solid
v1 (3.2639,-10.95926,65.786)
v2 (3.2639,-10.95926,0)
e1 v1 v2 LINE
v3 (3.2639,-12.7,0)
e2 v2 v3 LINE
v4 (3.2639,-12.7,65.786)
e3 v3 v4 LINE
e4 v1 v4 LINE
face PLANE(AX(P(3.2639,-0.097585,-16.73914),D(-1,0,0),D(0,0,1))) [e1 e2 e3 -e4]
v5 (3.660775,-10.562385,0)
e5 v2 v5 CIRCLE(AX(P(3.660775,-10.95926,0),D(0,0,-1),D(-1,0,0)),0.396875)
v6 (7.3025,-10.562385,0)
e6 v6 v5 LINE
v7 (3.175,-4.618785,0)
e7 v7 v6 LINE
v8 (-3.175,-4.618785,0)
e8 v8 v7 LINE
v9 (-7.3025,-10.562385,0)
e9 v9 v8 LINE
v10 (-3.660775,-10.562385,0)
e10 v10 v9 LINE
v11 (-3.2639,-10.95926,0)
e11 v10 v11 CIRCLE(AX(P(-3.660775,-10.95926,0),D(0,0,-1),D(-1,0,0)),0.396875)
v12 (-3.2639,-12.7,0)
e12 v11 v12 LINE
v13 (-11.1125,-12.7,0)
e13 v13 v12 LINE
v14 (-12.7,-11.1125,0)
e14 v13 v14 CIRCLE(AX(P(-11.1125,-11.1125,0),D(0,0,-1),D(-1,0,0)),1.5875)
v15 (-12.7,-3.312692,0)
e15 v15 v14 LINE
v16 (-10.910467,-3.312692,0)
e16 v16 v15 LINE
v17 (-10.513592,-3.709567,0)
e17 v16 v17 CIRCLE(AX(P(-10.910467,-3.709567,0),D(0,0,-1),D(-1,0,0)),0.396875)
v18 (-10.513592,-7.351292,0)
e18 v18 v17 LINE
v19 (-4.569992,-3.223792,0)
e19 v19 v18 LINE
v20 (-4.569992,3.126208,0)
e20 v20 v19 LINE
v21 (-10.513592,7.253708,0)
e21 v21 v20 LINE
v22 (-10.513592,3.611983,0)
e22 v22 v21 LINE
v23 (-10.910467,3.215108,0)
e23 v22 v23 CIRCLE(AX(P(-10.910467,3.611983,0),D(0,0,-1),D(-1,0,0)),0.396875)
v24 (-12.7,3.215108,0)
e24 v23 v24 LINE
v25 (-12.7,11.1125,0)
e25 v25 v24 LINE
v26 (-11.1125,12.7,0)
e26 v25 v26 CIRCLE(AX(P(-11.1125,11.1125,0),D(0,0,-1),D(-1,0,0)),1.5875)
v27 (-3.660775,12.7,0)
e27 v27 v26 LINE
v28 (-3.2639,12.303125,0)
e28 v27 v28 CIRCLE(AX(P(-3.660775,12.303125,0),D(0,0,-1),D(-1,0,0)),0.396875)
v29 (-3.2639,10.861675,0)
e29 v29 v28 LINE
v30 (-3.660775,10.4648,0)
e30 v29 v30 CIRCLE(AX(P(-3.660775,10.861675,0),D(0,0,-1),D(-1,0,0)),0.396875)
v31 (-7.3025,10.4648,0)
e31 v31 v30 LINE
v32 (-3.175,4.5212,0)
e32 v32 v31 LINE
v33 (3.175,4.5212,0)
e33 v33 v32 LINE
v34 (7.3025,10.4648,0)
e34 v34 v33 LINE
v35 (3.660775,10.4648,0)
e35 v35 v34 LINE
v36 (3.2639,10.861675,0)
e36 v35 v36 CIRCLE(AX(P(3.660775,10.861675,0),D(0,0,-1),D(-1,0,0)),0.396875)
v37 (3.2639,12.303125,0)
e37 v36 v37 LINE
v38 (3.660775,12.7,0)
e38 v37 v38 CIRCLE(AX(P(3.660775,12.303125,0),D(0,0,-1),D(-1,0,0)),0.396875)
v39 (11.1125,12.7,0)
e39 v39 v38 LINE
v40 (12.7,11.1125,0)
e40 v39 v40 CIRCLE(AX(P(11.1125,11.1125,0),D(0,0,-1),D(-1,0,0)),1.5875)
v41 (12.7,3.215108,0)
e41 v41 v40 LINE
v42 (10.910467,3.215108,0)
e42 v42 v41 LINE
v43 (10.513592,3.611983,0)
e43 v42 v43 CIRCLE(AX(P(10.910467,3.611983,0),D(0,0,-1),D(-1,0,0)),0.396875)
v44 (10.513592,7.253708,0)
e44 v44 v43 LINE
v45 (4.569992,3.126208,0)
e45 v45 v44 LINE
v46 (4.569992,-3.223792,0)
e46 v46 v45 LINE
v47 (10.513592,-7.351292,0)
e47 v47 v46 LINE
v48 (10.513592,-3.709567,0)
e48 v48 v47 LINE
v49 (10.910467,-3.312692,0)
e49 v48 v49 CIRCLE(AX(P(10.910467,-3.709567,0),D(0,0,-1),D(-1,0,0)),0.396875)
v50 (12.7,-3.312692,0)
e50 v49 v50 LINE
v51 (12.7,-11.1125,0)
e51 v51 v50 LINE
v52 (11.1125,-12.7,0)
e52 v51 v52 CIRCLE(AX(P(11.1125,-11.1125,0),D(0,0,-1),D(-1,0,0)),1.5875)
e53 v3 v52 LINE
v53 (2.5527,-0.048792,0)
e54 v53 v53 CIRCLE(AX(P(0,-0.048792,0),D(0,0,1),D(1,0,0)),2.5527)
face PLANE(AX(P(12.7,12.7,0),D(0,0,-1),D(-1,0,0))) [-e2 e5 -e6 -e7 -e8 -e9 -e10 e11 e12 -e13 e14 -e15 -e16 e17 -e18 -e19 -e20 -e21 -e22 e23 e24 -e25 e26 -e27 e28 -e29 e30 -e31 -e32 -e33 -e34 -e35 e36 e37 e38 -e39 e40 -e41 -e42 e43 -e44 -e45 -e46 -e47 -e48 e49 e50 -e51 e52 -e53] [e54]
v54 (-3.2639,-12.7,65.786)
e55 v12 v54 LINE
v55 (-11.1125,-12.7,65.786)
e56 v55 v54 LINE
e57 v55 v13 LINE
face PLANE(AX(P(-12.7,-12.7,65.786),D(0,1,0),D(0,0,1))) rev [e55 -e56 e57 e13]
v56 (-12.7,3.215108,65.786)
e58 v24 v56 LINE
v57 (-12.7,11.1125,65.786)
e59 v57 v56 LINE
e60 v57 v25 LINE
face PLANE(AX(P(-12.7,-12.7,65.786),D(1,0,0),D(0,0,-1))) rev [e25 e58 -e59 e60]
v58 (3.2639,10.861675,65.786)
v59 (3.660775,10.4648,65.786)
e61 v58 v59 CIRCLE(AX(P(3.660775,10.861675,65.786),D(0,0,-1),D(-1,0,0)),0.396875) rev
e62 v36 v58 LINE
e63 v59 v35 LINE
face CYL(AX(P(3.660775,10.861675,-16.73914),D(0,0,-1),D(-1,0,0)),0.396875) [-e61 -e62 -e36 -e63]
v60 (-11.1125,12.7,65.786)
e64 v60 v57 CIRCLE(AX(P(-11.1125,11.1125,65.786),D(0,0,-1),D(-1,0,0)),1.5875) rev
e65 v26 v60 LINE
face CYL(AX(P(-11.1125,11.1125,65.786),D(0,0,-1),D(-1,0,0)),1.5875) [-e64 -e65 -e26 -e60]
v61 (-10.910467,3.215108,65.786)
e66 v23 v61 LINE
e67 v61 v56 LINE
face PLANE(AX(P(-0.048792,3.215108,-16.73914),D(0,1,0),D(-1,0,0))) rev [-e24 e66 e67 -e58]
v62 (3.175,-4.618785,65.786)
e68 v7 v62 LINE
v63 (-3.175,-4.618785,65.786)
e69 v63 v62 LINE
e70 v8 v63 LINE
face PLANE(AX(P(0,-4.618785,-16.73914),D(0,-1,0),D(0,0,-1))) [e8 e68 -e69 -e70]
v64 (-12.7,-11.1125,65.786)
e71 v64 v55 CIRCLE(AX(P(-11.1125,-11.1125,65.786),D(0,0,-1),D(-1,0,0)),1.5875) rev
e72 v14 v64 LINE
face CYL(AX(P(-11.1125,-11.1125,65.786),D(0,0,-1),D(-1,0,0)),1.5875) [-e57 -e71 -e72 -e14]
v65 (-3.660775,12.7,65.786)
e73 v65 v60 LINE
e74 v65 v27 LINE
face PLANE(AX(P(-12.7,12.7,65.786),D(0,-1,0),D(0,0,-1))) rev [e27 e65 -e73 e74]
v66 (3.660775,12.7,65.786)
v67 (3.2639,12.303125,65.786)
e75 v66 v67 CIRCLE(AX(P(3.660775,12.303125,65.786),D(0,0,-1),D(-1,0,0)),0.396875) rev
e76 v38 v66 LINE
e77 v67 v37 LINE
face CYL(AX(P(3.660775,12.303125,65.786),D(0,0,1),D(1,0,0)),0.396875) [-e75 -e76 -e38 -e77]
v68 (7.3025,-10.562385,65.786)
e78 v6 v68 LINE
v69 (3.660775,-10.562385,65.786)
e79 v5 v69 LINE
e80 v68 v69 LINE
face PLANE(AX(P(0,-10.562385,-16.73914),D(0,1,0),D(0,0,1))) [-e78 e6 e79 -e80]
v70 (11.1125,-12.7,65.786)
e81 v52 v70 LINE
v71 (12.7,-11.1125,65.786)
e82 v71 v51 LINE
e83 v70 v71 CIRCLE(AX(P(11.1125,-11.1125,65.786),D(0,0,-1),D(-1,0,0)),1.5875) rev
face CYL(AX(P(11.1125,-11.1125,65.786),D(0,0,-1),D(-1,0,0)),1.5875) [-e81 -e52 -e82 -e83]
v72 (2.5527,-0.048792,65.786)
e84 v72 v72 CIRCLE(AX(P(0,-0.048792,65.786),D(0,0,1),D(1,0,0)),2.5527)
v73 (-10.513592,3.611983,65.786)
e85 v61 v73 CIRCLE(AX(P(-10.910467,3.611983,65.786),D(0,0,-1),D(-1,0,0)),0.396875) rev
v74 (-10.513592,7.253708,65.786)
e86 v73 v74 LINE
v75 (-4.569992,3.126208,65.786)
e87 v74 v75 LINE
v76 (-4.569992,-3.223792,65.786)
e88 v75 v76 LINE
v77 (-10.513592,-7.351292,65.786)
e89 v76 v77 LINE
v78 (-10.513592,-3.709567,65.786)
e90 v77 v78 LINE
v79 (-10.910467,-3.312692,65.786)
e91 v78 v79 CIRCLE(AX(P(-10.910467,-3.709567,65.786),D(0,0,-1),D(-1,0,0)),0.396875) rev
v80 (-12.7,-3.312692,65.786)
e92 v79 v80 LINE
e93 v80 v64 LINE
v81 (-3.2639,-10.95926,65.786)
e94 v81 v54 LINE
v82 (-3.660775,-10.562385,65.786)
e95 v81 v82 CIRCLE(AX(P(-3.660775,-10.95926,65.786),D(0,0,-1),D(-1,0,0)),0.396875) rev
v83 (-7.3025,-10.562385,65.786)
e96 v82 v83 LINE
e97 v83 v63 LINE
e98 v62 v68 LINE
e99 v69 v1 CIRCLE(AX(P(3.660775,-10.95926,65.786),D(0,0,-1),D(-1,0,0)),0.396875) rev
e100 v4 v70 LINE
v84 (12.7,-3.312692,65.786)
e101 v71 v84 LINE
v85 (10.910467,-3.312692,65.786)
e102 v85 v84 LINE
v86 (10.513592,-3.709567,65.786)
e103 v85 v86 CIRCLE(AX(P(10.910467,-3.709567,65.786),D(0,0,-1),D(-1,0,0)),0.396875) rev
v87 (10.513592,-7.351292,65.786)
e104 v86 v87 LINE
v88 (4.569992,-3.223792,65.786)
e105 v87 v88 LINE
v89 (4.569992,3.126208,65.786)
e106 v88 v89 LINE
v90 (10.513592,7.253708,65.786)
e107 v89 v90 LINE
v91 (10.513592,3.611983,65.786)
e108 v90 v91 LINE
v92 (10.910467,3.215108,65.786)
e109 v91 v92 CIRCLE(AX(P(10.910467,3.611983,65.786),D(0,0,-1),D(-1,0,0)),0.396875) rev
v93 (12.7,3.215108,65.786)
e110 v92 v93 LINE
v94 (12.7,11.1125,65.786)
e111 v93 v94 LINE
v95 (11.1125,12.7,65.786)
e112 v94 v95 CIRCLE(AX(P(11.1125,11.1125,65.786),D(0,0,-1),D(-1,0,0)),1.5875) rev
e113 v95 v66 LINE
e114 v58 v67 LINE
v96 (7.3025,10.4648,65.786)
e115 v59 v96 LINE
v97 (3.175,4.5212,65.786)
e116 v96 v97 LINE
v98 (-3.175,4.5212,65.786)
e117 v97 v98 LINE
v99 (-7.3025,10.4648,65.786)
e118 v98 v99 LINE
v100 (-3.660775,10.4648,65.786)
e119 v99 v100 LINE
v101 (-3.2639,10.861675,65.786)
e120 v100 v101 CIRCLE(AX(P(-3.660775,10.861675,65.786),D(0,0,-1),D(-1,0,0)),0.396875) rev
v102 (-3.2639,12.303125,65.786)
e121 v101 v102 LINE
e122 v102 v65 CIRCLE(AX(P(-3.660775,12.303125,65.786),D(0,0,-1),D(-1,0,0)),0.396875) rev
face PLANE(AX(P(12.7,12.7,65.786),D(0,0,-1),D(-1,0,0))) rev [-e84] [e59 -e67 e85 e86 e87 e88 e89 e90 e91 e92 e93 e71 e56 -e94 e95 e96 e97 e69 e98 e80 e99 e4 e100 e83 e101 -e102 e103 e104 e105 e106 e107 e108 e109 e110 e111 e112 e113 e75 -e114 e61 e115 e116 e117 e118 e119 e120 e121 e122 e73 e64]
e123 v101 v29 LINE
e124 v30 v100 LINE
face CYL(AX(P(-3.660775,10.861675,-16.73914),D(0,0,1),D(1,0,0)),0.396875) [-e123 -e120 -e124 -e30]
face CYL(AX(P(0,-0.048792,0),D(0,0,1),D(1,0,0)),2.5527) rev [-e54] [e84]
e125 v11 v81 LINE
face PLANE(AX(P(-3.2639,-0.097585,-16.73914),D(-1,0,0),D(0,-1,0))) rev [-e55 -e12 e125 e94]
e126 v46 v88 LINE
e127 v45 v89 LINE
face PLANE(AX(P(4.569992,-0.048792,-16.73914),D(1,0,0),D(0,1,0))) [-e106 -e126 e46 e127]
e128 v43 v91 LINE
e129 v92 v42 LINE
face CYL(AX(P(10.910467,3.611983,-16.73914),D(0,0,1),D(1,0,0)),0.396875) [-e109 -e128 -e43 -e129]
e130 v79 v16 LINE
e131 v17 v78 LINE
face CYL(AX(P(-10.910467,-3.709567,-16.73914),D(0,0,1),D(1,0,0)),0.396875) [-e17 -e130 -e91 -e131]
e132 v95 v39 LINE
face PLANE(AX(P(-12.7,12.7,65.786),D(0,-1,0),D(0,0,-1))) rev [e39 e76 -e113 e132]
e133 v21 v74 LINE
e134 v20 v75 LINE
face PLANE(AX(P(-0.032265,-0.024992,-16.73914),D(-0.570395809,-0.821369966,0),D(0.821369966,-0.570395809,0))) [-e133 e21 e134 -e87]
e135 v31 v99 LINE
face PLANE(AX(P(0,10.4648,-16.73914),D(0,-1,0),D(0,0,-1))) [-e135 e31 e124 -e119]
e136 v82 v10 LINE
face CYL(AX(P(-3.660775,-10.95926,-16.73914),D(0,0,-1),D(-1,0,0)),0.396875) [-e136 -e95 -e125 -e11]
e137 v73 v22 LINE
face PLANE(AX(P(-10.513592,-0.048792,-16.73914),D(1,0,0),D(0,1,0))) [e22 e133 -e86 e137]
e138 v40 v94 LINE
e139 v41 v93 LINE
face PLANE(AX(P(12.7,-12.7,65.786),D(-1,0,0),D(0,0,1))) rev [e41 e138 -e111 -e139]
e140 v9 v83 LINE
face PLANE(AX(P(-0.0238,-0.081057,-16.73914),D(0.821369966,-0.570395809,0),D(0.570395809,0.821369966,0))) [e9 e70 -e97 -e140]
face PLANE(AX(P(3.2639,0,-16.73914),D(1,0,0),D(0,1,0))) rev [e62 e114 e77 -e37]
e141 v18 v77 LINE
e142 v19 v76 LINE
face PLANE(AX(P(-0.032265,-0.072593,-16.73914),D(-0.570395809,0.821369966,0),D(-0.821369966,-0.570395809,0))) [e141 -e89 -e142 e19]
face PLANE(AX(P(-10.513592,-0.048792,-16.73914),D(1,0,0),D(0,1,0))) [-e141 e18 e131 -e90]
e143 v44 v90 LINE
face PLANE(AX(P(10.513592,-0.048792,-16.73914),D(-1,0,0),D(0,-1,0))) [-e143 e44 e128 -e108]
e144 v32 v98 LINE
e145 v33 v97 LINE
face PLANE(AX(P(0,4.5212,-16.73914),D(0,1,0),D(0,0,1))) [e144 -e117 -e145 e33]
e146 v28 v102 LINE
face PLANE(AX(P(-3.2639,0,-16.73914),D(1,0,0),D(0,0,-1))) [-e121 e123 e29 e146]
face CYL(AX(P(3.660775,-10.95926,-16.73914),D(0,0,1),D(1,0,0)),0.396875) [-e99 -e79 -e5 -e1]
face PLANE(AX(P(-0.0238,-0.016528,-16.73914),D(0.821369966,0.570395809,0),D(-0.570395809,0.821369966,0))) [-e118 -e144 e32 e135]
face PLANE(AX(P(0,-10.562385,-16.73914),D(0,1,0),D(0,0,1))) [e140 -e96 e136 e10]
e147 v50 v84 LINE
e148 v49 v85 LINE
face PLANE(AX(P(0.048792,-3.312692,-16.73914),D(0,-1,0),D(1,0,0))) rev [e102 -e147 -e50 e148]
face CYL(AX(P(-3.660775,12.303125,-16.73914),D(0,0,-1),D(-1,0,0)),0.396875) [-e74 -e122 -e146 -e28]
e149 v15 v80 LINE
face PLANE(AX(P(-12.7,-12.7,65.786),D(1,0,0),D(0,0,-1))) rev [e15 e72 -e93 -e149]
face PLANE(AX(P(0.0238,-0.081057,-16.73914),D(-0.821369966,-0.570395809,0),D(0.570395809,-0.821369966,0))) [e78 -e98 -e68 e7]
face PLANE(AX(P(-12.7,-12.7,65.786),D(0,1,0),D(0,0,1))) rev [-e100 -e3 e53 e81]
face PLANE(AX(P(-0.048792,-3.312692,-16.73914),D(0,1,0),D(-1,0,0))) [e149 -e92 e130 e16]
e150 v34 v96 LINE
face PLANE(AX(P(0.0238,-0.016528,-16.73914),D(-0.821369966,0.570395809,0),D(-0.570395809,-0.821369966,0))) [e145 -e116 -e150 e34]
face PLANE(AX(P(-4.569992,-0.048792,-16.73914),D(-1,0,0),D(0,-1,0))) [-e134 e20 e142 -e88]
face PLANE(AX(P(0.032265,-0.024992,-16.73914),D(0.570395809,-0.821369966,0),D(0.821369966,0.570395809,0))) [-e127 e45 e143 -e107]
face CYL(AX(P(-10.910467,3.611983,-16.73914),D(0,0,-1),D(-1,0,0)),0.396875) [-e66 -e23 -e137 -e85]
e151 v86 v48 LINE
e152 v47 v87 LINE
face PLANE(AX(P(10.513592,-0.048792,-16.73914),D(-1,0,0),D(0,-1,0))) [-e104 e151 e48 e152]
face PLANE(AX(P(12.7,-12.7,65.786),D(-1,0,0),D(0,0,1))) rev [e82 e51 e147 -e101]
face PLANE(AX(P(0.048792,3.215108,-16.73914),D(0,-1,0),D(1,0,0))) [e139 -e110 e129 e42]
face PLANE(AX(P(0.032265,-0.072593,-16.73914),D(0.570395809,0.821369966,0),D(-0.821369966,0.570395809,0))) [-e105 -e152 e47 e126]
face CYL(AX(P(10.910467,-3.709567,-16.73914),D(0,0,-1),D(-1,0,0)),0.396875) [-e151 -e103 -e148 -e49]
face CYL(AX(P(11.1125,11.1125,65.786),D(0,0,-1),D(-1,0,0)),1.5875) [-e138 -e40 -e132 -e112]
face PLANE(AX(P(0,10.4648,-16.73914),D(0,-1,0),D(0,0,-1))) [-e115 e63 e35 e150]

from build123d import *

# Parameters (mm, degrees)
SKETCH1_W                   = 25.4
SKETCH1_H                   = 25.4
BOSS_EXTRUDE1_DEPTH         = 65.786
FILLET1_R                   = 1.5875
HOLE1_OUTLINE_R             = 2.5527
HOLE1_DEPTH                 = 65.786
SKETCH7_W                   = 6.5278
SKETCH7_H                   = 2.2352
CUT_EXTRUDE2_DEPTH          = 65.786
FILLET4_R                   = 0.396875
CIRPATTERN2_DEPTH           = 65.786
F_1_4_20_TAPPED_HOLE1_D     = 5.1054
F_1_4_20_TAPPED_HOLE1_DEPTH = 6.35
F_1_4_20_TAPPED_HOLE1_TIP   = 1.533816902


# Read off the part's stored shape, not the designer's step: Hole1, CirPattern2
with BuildPart() as part:
    # Sketch1 → Boss-Extrude1 (new body)
    with BuildSketch(Plane.XY):
        Rectangle(SKETCH1_W, SKETCH1_H)
    extrude(amount=BOSS_EXTRUDE1_DEPTH)

    # Fillet1
    fillet1_edges = [part.edges().sort_by_distance(p)[0] for p in [
        (12.7, -12.7, 32.893),
        (-12.7, -12.7, 32.893),
        (-12.7, 12.7, 32.893),
        (12.7, 12.7, 32.893),
    ]]
    fillet(fillet1_edges, radius=FILLET1_R)

    # Hole1 outline → Hole1 (cut)
    with BuildSketch(Plane.XY):
        with Locations((0, -0.048792482)):
            Circle(HOLE1_OUTLINE_R)
    extrude(amount=HOLE1_DEPTH, mode=Mode.SUBTRACT)

    # Sketch7 → Cut-Extrude2 (cut)
    with BuildSketch(Plane.XY.offset(65.786)):
        with Locations((0, 11.5824)):
            Rectangle(SKETCH7_W, SKETCH7_H)
        Polygon((-3.175, 4.5212), (-7.3025, 10.4648), (7.3025, 10.4648), (3.175, 4.5212), align=None)
    extrude(amount=-CUT_EXTRUDE2_DEPTH, mode=Mode.SUBTRACT)

    # Fillet4
    fillet4_edges = [part.edges().sort_by_distance(p)[0] for p in [
        (-3.2639, 10.4648, 32.893),
        (-3.2639, 12.7, 32.893),
        (3.2639, 12.7, 32.893),
        (3.2639, 10.4648, 32.893),
    ]]
    fillet(fillet4_edges, radius=FILLET4_R)

    # CirPattern2 outline → CirPattern2 (cut)
    with BuildSketch(Plane.XY):
        with BuildLine():
            ThreePointArc((-3.660775, -10.562384964), (-3.380141996, -10.67862696), (-3.2639, -10.959259964))
            Line((-3.2639, -10.959259964), (-3.2639, -12.7))
            Line((-3.2639, -12.7), (3.2639, -12.7))
            Line((3.2639, -12.7), (3.2639, -10.959259964))
            ThreePointArc((3.2639, -10.959259964), (3.380141996, -10.67862696), (3.660775, -10.562384964))
            Line((3.660775, -10.562384964), (7.3025, -10.562384964))
            Line((7.3025, -10.562384964), (3.175, -4.618784964))
            Line((3.175, -4.618784964), (-3.175, -4.618784964))
            Line((-3.175, -4.618784964), (-7.3025, -10.562384964))
            Line((-7.3025, -10.562384964), (-3.660775, -10.562384964))
        make_face()
        with BuildLine():
            Line((-12.7, -3.312692482), (-10.910467482, -3.312692482))
            ThreePointArc((-10.910467482, -3.312692482), (-10.629834478, -3.428934478), (-10.513592482, -3.709567482))
            Line((-10.513592482, -3.709567482), (-10.513592482, -7.351292482))
            Line((-10.513592482, -7.351292482), (-4.569992482, -3.223792482))
            Line((-4.569992482, -3.223792482), (-4.569992482, 3.126207518))
            Line((-4.569992482, 3.126207518), (-10.513592482, 7.253707518))
            Line((-10.513592482, 7.253707518), (-10.513592482, 3.611982518))
            ThreePointArc((-10.513592482, 3.611982518), (-10.629834478, 3.331349514), (-10.910467482, 3.215107518))
            Line((-10.910467482, 3.215107518), (-12.7, 3.215107518))
            Line((-12.7, 3.215107518), (-12.7, -3.312692482))
        make_face()
        with BuildLine():
            ThreePointArc((10.513592482, -3.709567482), (10.629834478, -3.428934478), (10.910467482, -3.312692482))
            Line((10.910467482, -3.312692482), (12.7, -3.312692482))
            Line((12.7, -3.312692482), (12.7, 3.215107518))
            Line((12.7, 3.215107518), (10.910467482, 3.215107518))
            ThreePointArc((10.910467482, 3.215107518), (10.629834478, 3.331349514), (10.513592482, 3.611982518))
            Line((10.513592482, 3.611982518), (10.513592482, 7.253707518))
            Line((10.513592482, 7.253707518), (4.569992482, 3.126207518))
            Line((4.569992482, 3.126207518), (4.569992482, -3.223792482))
            Line((4.569992482, -3.223792482), (10.513592482, -7.351292482))
            Line((10.513592482, -7.351292482), (10.513592482, -3.709567482))
        make_face()
    extrude(amount=CIRPATTERN2_DEPTH, mode=Mode.SUBTRACT)

    # 1/4-20 Tapped Hole1
    with Locations(Plane(origin=(0, -0.048792482, 65.786), x_dir=(1, 0, 0), z_dir=(0, 0, 1))):
        with Locations((0, 0)):
            Hole(F_1_4_20_TAPPED_HOLE1_D / 2, depth=F_1_4_20_TAPPED_HOLE1_DEPTH)
            with Locations((0, 0, -(F_1_4_20_TAPPED_HOLE1_DEPTH + F_1_4_20_TAPPED_HOLE1_TIP / 2))):  # 118° drill point
                Cone(0, F_1_4_20_TAPPED_HOLE1_D / 2, F_1_4_20_TAPPED_HOLE1_TIP, mode=Mode.SUBTRACT)


solid = part.part
